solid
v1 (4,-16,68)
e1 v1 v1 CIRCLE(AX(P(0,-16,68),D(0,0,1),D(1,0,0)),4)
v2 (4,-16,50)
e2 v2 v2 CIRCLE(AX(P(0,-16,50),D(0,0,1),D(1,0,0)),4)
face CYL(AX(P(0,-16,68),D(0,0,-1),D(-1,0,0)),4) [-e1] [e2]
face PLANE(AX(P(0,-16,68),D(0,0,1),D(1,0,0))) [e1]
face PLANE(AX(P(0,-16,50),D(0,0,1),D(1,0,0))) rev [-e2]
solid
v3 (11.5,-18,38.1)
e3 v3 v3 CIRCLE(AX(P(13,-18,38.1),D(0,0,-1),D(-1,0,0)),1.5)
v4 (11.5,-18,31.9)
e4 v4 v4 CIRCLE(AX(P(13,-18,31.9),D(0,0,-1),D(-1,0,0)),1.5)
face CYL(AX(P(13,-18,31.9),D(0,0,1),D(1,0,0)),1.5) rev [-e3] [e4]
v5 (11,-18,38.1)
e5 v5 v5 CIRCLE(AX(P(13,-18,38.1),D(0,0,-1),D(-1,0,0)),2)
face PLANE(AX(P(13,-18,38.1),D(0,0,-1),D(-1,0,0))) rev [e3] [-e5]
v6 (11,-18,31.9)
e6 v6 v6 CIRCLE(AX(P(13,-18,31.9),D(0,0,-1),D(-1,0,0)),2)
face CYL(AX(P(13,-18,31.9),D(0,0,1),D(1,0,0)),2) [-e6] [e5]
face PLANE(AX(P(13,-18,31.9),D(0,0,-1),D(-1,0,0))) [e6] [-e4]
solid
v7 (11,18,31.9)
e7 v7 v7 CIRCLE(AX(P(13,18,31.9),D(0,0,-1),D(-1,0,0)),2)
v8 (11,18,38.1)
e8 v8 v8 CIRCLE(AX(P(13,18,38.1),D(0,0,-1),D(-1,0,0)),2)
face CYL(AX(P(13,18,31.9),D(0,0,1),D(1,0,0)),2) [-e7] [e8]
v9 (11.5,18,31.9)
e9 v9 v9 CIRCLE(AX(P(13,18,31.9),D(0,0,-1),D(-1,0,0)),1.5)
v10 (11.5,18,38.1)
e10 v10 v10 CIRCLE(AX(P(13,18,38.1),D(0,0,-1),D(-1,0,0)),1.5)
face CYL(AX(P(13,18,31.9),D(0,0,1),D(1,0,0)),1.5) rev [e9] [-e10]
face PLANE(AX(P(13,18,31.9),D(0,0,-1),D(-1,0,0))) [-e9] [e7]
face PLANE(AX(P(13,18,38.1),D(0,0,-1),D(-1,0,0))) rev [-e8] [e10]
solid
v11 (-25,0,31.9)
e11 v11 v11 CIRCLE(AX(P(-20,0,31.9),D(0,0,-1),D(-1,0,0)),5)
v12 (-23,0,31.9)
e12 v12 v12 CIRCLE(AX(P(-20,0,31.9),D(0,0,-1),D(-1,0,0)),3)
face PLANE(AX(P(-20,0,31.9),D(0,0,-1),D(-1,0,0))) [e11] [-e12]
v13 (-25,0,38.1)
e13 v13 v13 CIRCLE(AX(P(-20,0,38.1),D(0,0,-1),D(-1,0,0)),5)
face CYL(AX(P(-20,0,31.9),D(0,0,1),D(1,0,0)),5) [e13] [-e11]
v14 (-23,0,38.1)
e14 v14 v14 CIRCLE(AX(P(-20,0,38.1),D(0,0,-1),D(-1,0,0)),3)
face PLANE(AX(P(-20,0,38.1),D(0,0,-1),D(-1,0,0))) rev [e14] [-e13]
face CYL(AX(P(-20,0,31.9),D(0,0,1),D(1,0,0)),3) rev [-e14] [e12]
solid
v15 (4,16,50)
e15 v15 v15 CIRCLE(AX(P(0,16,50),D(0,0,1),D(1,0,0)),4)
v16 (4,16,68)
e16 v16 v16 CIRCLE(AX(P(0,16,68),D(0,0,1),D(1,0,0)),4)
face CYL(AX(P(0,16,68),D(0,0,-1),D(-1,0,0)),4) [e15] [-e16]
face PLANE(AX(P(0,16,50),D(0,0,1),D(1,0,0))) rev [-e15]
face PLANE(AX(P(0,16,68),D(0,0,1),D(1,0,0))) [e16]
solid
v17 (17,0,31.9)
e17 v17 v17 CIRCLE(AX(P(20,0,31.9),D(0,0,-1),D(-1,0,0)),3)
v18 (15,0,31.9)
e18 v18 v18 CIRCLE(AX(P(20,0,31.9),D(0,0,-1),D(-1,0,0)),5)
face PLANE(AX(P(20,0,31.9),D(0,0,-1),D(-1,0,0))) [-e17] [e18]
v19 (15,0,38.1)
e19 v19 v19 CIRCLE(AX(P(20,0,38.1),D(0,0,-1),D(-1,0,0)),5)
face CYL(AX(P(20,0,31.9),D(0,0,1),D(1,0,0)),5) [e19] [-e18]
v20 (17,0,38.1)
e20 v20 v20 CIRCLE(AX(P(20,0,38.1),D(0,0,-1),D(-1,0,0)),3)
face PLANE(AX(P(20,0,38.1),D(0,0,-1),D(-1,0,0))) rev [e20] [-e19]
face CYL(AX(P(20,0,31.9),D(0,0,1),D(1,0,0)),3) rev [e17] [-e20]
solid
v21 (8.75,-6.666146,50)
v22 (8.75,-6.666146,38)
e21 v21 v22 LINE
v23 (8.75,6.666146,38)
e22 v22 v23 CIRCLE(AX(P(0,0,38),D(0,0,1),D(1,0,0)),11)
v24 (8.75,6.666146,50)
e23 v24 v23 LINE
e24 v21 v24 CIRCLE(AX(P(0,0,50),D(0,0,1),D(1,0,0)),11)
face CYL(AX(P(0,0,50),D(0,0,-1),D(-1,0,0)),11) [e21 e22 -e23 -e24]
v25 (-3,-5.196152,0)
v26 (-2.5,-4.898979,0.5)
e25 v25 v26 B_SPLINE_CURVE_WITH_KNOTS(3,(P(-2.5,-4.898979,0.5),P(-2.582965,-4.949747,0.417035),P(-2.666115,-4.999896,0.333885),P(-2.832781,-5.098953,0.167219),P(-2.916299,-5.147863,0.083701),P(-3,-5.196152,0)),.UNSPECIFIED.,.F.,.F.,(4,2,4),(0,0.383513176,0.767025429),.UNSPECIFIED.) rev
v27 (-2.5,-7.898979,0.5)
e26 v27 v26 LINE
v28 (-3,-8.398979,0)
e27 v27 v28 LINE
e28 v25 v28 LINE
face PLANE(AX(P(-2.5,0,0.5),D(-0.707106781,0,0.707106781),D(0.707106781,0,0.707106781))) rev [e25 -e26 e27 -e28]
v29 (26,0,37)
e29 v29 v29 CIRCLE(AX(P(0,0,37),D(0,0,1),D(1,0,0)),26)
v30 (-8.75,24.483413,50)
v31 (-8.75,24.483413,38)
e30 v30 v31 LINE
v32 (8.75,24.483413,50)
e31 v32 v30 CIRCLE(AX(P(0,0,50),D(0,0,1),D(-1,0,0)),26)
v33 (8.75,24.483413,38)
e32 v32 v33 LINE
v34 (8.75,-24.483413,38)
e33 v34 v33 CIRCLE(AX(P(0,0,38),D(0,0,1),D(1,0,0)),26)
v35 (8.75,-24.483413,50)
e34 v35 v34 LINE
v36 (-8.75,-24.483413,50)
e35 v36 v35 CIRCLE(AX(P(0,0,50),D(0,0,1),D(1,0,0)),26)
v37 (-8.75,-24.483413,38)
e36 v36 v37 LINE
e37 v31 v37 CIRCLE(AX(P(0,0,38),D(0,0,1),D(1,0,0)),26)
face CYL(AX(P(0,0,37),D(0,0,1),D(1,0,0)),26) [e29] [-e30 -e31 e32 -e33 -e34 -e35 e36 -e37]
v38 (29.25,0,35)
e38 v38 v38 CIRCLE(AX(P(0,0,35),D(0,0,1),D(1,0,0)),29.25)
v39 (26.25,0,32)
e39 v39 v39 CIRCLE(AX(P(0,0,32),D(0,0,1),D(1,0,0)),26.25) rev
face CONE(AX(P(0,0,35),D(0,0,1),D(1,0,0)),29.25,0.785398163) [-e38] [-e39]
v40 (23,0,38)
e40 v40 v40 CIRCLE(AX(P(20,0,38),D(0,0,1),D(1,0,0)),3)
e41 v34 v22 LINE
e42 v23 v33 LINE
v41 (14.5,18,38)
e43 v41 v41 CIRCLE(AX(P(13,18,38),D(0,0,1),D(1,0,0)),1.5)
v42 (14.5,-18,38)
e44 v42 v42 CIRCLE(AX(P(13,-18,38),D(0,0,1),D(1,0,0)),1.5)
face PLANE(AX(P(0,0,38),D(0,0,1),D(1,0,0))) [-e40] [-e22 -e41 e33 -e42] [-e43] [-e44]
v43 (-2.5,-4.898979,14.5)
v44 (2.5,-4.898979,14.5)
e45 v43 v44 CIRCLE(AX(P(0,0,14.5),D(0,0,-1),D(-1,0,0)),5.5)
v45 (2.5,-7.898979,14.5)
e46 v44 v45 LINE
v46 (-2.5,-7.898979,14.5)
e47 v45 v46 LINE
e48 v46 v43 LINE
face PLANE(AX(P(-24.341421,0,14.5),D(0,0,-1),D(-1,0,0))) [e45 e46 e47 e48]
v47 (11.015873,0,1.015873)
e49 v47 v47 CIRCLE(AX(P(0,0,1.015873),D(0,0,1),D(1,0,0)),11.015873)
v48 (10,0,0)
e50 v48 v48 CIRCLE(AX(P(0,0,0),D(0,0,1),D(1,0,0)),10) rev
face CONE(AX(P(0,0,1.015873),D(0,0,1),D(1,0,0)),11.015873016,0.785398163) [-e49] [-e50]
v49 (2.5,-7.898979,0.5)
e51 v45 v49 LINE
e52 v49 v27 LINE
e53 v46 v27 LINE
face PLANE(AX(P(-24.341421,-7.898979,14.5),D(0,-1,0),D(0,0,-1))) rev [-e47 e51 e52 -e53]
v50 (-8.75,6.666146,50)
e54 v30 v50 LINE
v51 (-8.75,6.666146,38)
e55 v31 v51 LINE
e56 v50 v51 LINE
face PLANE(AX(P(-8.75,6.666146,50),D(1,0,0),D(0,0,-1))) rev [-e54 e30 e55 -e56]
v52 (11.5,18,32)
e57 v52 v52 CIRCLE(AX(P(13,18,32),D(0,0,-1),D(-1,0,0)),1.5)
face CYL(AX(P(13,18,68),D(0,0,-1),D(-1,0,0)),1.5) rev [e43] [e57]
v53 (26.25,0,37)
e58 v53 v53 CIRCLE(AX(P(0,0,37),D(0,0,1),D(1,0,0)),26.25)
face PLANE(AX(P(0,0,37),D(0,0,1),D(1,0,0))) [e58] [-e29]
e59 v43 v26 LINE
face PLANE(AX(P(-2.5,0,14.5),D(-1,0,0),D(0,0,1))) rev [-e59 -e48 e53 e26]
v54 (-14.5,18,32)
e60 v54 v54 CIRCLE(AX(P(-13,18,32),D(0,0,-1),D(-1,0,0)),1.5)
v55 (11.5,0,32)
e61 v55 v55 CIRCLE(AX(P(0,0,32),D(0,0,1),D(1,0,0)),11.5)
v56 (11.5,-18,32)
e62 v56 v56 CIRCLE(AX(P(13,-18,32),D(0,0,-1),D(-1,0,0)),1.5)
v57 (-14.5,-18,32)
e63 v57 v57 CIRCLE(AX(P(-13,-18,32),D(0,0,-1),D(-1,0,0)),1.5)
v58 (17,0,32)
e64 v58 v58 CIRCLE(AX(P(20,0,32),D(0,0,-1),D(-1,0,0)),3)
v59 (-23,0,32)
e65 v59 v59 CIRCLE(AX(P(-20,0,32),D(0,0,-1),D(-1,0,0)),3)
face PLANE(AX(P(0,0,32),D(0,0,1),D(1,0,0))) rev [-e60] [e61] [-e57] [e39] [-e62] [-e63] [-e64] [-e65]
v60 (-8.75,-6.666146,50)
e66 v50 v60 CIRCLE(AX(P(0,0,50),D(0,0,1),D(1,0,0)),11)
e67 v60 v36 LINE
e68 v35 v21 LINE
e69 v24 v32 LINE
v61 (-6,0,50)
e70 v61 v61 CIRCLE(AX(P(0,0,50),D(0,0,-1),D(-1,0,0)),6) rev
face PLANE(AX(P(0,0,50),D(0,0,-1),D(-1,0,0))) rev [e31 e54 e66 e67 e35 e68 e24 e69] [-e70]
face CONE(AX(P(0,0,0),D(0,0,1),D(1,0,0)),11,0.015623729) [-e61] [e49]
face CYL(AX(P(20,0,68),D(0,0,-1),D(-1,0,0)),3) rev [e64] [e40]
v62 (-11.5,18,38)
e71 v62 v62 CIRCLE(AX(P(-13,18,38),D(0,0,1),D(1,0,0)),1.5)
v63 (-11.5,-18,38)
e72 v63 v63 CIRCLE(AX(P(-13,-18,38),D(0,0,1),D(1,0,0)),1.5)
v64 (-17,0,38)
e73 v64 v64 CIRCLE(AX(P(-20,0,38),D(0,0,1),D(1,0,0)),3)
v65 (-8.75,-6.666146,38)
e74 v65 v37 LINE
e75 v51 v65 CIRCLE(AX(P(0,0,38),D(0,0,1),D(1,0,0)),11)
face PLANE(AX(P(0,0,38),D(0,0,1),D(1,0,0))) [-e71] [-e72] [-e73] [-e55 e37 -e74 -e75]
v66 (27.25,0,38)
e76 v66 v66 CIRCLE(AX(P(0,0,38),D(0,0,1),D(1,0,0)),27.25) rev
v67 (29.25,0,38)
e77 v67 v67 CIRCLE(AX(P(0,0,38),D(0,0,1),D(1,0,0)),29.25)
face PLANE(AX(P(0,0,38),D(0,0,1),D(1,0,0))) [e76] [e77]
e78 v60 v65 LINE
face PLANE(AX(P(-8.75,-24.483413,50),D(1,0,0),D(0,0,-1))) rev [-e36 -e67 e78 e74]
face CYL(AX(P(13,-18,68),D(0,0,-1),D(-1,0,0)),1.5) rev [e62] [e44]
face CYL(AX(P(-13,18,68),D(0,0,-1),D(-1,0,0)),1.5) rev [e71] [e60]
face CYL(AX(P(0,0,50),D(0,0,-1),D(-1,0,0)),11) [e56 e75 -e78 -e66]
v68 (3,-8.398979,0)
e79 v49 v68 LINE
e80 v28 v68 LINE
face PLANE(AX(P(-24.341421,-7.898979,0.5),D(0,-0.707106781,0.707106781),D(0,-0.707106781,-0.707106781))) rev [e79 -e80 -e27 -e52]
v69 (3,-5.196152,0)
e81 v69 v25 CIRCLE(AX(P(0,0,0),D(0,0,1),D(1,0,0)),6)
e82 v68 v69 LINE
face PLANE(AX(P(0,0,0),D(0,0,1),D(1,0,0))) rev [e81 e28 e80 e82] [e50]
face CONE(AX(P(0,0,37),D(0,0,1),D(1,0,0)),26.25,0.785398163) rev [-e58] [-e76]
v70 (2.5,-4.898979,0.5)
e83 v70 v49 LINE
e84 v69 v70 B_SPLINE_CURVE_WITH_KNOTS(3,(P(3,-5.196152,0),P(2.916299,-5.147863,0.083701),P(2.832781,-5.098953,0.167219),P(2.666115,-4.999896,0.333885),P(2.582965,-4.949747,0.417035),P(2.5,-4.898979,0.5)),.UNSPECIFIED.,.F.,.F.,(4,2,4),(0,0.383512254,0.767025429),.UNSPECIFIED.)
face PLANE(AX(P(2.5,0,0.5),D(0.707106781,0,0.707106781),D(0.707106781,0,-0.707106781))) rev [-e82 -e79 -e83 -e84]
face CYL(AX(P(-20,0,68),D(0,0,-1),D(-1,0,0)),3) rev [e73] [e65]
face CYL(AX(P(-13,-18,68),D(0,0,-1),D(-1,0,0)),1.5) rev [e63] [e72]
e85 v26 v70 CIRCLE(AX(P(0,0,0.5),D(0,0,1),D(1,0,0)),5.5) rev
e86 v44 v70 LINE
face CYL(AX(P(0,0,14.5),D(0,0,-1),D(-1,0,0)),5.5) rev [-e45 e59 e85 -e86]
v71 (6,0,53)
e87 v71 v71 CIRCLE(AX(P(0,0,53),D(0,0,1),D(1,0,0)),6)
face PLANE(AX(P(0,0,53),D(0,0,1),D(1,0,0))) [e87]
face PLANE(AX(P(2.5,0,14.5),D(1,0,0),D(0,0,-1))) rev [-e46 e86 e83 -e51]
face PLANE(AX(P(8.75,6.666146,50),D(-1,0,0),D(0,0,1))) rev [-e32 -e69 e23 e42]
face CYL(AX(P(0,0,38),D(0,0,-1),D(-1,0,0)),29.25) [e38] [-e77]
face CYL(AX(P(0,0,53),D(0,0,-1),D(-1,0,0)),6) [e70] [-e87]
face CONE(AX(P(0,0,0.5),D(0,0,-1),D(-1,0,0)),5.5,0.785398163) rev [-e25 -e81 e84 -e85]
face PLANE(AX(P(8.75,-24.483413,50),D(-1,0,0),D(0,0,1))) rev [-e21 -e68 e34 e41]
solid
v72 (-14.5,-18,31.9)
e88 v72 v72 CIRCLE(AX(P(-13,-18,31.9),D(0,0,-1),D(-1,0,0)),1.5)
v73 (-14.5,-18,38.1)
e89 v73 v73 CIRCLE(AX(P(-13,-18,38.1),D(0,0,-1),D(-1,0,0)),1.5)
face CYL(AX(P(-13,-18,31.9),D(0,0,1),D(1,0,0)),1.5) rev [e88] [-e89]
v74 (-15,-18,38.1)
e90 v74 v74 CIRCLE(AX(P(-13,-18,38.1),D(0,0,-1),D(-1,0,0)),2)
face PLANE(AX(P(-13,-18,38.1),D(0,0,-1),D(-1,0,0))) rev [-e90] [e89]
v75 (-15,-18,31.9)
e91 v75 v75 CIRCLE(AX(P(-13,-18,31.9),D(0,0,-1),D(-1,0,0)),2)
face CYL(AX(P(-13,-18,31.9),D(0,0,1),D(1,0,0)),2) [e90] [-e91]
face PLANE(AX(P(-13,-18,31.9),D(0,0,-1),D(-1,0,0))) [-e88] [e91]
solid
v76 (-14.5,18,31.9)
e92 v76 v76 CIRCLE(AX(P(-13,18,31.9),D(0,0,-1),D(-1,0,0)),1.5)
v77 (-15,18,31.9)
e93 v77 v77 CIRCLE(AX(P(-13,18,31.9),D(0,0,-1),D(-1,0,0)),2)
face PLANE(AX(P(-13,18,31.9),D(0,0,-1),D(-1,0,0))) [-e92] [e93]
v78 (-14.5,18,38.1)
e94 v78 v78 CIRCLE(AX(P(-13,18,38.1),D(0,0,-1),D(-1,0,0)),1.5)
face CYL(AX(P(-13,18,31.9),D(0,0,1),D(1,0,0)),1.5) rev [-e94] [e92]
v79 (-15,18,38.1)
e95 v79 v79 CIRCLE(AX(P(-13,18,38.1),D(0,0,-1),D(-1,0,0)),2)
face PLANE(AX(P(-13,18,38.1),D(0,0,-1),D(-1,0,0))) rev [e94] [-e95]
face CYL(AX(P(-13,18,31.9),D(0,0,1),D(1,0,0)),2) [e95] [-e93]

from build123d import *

# Parameters (mm, degrees)
SKETCH_1_R             = 11
SKETCH_2_R             = 11.5
SKETCH_3_R             = 5.5
CUT_EXTRUDE_1_DEPTH    = 14.5
CHAMFER_1_SIZE         = 1
CHAMFER_1_SIZE2        = 1.015997016
CHAMFER_2_SIZE         = 0.5
SKETCH_4_R             = 29.25
EXTRUDE_1_DEPTH        = 6
CHAMFER_3_SIZE         = 3
SKETCH_5_R             = 26.25
SKETCH_5_R_2           = 26
CUT_EXTRUDE_2_DEPTH    = 1
CHAMFER_4_SIZE         = 1
EXTRUDE_START          = 12
EXTRUDE_2_DEPTH        = 12
SKETCH_7_R             = 6
EXTRUDE_3_DEPTH        = 3
SKETCH_8_R             = 4
EXTRUDE_4_DEPTH        = 18
EXTRUDE_4_2_DEPTH      = 18
SKETCH_10_R            = 1.5
SKETCH_10_R_2          = 3
CUT_EXTRUDE_4_DEPTH    = 55.837259231
EXTRUDE_5_DEPTH        = 0.1
EXTRUDE_5_DEPTH_BACK   = 6.1
SKETCH_11_R            = 5
SKETCH_11_R_2          = 3
EXTRUDE_5_2_DEPTH      = 0.1
EXTRUDE_5_2_DEPTH_BACK = 6.1
EXTRUDE_5_3_DEPTH      = 0.1
EXTRUDE_5_3_DEPTH_BACK = 6.1
SKETCH_11_R_3          = 2
SKETCH_11_R_4          = 1.5
EXTRUDE_5_4_DEPTH      = 0.1
EXTRUDE_5_4_DEPTH_BACK = 6.1
EXTRUDE_5_5_DEPTH      = 0.1
EXTRUDE_5_5_DEPTH_BACK = 6.1
EXTRUDE_5_6_DEPTH      = 0.1
EXTRUDE_5_6_DEPTH_BACK = 6.1


with BuildPart() as part:
    # ｽｹｯﾁ1 → ﾛﾌﾄ1 section 0
    with BuildSketch(Plane.XY):
        Circle(SKETCH_1_R)
    # ｽｹｯﾁ2 → ﾛﾌﾄ1 section 1
    with BuildSketch(Plane.XY.offset(32)):
        Circle(SKETCH_2_R)
    loft()

    # ｽｹｯﾁ3 → ｶｯﾄ - 押し出し1 (cut)
    with BuildSketch(Plane(origin=(0, 0, 0), x_dir=(-1, 0, 0), z_dir=(0, 0, -1))):
        Circle(SKETCH_3_R)
        with BuildLine():
            ThreePointArc((2.5, -4.898979486), (0, -5.5), (-2.5, -4.898979486))
            Line((-2.5, -4.898979486), (-2.5, -7.898979486))
            Line((-2.5, -7.898979486), (2.5, -7.898979486))
            Line((2.5, -7.898979486), (2.5, -4.898979486))
        make_face()
    extrude(amount=-CUT_EXTRUDE_1_DEPTH, mode=Mode.SUBTRACT)

    # 面取り1
    chamfer_1_edges = [part.edges().sort_by_distance(p)[0] for p in [
        (-11, 0, 0),
    ]]
    chamfer_1_side = [part.faces().sort_by_distance(p)[0] for p in [
        (-10.688873016, 0, 0),
    ]]
    chamfer(chamfer_1_edges, length=CHAMFER_1_SIZE, length2=CHAMFER_1_SIZE2, reference=chamfer_1_side[0])

    # 面取り2
    chamfer_2_edges = [part.edges().sort_by_distance(p)[0] for p in [
        (0, 5.5, 0),
        (2.5, -6.398979486, 0),
        (0, -7.898979486, 0),
        (-2.5, -6.398979486, 0),
    ]]
    chamfer(chamfer_2_edges, length=CHAMFER_2_SIZE)

    # ｽｹｯﾁ4 → ﾎﾞｽ - 押し出し1 (add)
    with BuildSketch(Plane.XY.offset(32)):
        Circle(SKETCH_4_R)
    extrude(amount=EXTRUDE_1_DEPTH)

    # 面取り3
    chamfer_3_edges = [part.edges().sort_by_distance(p)[0] for p in [
        (-29.25, 0, 32),
    ]]
    chamfer(chamfer_3_edges, length=CHAMFER_3_SIZE)

    # ｽｹｯﾁ5 → ｶｯﾄ - 押し出し2 (cut)
    with BuildSketch(Plane.XY.offset(38)):
        Circle(SKETCH_5_R)
        Circle(SKETCH_5_R_2, mode=Mode.SUBTRACT)
    extrude(amount=-CUT_EXTRUDE_2_DEPTH, mode=Mode.SUBTRACT)

    # 面取り4
    chamfer_4_edges = [part.edges().sort_by_distance(p)[0] for p in [
        (-26.25, 0, 38),
    ]]
    chamfer(chamfer_4_edges, length=CHAMFER_4_SIZE - 0.0001)  # a hair under: the kernel refuses the full size

    # ｽｹｯﾁ6 → ﾎﾞｽ - 押し出し2 (add)
    with BuildSketch(Plane.XY.offset(38).offset(EXTRUDE_START)):
        with BuildLine():
            Line((8.75, 6.666145813), (8.75, 24.483412752))
            ThreePointArc((8.75, 24.483412752), (0, 26), (-8.75, 24.483412752))
            Line((-8.75, 24.483412752), (-8.75, 6.666145813))
            ThreePointArc((-8.75, 6.666145813), (-11, 0), (-8.75, -6.666145813))
            Line((-8.75, -6.666145813), (-8.75, -24.483412752))
            ThreePointArc((-8.75, -24.483412752), (0, -26), (8.75, -24.483412752))
            Line((8.75, -24.483412752), (8.75, -6.666145813))
            ThreePointArc((8.75, -6.666145813), (11, 0), (8.75, 6.666145813))
        make_face()
    extrude(amount=-EXTRUDE_2_DEPTH)

    # ｽｹｯﾁ7 → ﾎﾞｽ - 押し出し3 (add)
    with BuildSketch(Plane.XY.offset(50)):
        with Locations(Location((0, 0, 0), (0, 0, 180))):
            Circle(SKETCH_7_R)
    extrude(amount=EXTRUDE_3_DEPTH)

    # ｽｹｯﾁ10 → ｶｯﾄ - 押し出し4 (cut, through all)
    with BuildSketch(Plane(origin=(0, 0, 32), x_dir=(-1, 0, 0), z_dir=(0, 0, -1))):
        with Locations((13, 18)):
            Circle(SKETCH_10_R)
        with Locations((-13, 18)):
            Circle(SKETCH_10_R)
        with Locations((-13, -18)):
            Circle(SKETCH_10_R)
        with Locations((13, -18)):
            Circle(SKETCH_10_R)
        with Locations((-20, 0)):
            Circle(SKETCH_10_R_2)
        with Locations((20, 0)):
            Circle(SKETCH_10_R_2)
    extrude(amount=-CUT_EXTRUDE_4_DEPTH, mode=Mode.SUBTRACT)


with BuildPart() as body_2:
    # ｽｹｯﾁ8 → ﾎﾞｽ - 押し出し4 (new body)
    with BuildSketch(Plane.XY.offset(50)):
        with Locations((0, 16)):
            Circle(SKETCH_8_R)
    extrude(amount=EXTRUDE_4_DEPTH)


with BuildPart() as body_3:
    # ｽｹｯﾁ8 → Extrude 4 2 (new body)
    with BuildSketch(Plane.XY.offset(50)):
        with Locations((0, -16)):
            Circle(SKETCH_8_R)
    extrude(amount=EXTRUDE_4_2_DEPTH)


with BuildPart() as body_4:
    # ｽｹｯﾁ11 → ﾎﾞｽ - 押し出し5 (new, two sides: drawn at the far end of the back side and taken through both)
    with BuildSketch(Plane(origin=(0, 0, 32), x_dir=(-1, 0, 0), z_dir=(0, 0, -1)).offset(-EXTRUDE_5_DEPTH_BACK)):
        with Locations((-20, 0)):
            Circle(SKETCH_11_R)
        with Locations((-20, 0)):
            Circle(SKETCH_11_R_2, mode=Mode.SUBTRACT)
    extrude(amount=EXTRUDE_5_DEPTH + EXTRUDE_5_DEPTH_BACK)


with BuildPart() as body_5:
    # ｽｹｯﾁ11 → Extrude 5 2 (new, two sides: drawn at the far end of the back side and taken through both)
    with BuildSketch(Plane(origin=(0, 0, 32), x_dir=(-1, 0, 0), z_dir=(0, 0, -1)).offset(-EXTRUDE_5_2_DEPTH_BACK)):
        with Locations((20, 0)):
            Circle(SKETCH_11_R)
        with Locations((20, 0)):
            Circle(SKETCH_11_R_2, mode=Mode.SUBTRACT)
    extrude(amount=EXTRUDE_5_2_DEPTH + EXTRUDE_5_2_DEPTH_BACK)


with BuildPart() as body_6:
    # ｽｹｯﾁ11 → Extrude 5 3 (new, two sides: drawn at the far end of the back side and taken through both)
    with BuildSketch(Plane(origin=(0, 0, 32), x_dir=(-1, 0, 0), z_dir=(0, 0, -1)).offset(-EXTRUDE_5_3_DEPTH_BACK)):
        with Locations((13, 18)):
            Circle(SKETCH_11_R_3)
        with Locations((13, 18)):
            Circle(SKETCH_11_R_4, mode=Mode.SUBTRACT)
    extrude(amount=EXTRUDE_5_3_DEPTH + EXTRUDE_5_3_DEPTH_BACK)


with BuildPart() as body_7:
    # ｽｹｯﾁ11 → Extrude 5 4 (new, two sides: drawn at the far end of the back side and taken through both)
    with BuildSketch(Plane(origin=(0, 0, 32), x_dir=(-1, 0, 0), z_dir=(0, 0, -1)).offset(-EXTRUDE_5_4_DEPTH_BACK)):
        with Locations((-13, 18)):
            Circle(SKETCH_11_R_3)
        with Locations((-13, 18)):
            Circle(SKETCH_11_R_4, mode=Mode.SUBTRACT)
    extrude(amount=EXTRUDE_5_4_DEPTH + EXTRUDE_5_4_DEPTH_BACK)


with BuildPart() as body_8:
    # ｽｹｯﾁ11 → Extrude 5 5 (new, two sides: drawn at the far end of the back side and taken through both)
    with BuildSketch(Plane(origin=(0, 0, 32), x_dir=(-1, 0, 0), z_dir=(0, 0, -1)).offset(-EXTRUDE_5_5_DEPTH_BACK)):
        with Locations((-13, -18)):
            Circle(SKETCH_11_R_3)
        with Locations((-13, -18)):
            Circle(SKETCH_11_R_4, mode=Mode.SUBTRACT)
    extrude(amount=EXTRUDE_5_5_DEPTH + EXTRUDE_5_5_DEPTH_BACK)


with BuildPart() as body_9:
    # ｽｹｯﾁ11 → Extrude 5 6 (new, two sides: drawn at the far end of the back side and taken through both)
    with BuildSketch(Plane(origin=(0, 0, 32), x_dir=(-1, 0, 0), z_dir=(0, 0, -1)).offset(-EXTRUDE_5_6_DEPTH_BACK)):
        with Locations((13, -18)):
            Circle(SKETCH_11_R_3)
        with Locations((13, -18)):
            Circle(SKETCH_11_R_4, mode=Mode.SUBTRACT)
    extrude(amount=EXTRUDE_5_6_DEPTH + EXTRUDE_5_6_DEPTH_BACK)


solid = Compound([part.part, body_2.part, body_3.part, body_4.part, body_5.part, body_6.part, body_7.part, body_8.part, body_9.part])
